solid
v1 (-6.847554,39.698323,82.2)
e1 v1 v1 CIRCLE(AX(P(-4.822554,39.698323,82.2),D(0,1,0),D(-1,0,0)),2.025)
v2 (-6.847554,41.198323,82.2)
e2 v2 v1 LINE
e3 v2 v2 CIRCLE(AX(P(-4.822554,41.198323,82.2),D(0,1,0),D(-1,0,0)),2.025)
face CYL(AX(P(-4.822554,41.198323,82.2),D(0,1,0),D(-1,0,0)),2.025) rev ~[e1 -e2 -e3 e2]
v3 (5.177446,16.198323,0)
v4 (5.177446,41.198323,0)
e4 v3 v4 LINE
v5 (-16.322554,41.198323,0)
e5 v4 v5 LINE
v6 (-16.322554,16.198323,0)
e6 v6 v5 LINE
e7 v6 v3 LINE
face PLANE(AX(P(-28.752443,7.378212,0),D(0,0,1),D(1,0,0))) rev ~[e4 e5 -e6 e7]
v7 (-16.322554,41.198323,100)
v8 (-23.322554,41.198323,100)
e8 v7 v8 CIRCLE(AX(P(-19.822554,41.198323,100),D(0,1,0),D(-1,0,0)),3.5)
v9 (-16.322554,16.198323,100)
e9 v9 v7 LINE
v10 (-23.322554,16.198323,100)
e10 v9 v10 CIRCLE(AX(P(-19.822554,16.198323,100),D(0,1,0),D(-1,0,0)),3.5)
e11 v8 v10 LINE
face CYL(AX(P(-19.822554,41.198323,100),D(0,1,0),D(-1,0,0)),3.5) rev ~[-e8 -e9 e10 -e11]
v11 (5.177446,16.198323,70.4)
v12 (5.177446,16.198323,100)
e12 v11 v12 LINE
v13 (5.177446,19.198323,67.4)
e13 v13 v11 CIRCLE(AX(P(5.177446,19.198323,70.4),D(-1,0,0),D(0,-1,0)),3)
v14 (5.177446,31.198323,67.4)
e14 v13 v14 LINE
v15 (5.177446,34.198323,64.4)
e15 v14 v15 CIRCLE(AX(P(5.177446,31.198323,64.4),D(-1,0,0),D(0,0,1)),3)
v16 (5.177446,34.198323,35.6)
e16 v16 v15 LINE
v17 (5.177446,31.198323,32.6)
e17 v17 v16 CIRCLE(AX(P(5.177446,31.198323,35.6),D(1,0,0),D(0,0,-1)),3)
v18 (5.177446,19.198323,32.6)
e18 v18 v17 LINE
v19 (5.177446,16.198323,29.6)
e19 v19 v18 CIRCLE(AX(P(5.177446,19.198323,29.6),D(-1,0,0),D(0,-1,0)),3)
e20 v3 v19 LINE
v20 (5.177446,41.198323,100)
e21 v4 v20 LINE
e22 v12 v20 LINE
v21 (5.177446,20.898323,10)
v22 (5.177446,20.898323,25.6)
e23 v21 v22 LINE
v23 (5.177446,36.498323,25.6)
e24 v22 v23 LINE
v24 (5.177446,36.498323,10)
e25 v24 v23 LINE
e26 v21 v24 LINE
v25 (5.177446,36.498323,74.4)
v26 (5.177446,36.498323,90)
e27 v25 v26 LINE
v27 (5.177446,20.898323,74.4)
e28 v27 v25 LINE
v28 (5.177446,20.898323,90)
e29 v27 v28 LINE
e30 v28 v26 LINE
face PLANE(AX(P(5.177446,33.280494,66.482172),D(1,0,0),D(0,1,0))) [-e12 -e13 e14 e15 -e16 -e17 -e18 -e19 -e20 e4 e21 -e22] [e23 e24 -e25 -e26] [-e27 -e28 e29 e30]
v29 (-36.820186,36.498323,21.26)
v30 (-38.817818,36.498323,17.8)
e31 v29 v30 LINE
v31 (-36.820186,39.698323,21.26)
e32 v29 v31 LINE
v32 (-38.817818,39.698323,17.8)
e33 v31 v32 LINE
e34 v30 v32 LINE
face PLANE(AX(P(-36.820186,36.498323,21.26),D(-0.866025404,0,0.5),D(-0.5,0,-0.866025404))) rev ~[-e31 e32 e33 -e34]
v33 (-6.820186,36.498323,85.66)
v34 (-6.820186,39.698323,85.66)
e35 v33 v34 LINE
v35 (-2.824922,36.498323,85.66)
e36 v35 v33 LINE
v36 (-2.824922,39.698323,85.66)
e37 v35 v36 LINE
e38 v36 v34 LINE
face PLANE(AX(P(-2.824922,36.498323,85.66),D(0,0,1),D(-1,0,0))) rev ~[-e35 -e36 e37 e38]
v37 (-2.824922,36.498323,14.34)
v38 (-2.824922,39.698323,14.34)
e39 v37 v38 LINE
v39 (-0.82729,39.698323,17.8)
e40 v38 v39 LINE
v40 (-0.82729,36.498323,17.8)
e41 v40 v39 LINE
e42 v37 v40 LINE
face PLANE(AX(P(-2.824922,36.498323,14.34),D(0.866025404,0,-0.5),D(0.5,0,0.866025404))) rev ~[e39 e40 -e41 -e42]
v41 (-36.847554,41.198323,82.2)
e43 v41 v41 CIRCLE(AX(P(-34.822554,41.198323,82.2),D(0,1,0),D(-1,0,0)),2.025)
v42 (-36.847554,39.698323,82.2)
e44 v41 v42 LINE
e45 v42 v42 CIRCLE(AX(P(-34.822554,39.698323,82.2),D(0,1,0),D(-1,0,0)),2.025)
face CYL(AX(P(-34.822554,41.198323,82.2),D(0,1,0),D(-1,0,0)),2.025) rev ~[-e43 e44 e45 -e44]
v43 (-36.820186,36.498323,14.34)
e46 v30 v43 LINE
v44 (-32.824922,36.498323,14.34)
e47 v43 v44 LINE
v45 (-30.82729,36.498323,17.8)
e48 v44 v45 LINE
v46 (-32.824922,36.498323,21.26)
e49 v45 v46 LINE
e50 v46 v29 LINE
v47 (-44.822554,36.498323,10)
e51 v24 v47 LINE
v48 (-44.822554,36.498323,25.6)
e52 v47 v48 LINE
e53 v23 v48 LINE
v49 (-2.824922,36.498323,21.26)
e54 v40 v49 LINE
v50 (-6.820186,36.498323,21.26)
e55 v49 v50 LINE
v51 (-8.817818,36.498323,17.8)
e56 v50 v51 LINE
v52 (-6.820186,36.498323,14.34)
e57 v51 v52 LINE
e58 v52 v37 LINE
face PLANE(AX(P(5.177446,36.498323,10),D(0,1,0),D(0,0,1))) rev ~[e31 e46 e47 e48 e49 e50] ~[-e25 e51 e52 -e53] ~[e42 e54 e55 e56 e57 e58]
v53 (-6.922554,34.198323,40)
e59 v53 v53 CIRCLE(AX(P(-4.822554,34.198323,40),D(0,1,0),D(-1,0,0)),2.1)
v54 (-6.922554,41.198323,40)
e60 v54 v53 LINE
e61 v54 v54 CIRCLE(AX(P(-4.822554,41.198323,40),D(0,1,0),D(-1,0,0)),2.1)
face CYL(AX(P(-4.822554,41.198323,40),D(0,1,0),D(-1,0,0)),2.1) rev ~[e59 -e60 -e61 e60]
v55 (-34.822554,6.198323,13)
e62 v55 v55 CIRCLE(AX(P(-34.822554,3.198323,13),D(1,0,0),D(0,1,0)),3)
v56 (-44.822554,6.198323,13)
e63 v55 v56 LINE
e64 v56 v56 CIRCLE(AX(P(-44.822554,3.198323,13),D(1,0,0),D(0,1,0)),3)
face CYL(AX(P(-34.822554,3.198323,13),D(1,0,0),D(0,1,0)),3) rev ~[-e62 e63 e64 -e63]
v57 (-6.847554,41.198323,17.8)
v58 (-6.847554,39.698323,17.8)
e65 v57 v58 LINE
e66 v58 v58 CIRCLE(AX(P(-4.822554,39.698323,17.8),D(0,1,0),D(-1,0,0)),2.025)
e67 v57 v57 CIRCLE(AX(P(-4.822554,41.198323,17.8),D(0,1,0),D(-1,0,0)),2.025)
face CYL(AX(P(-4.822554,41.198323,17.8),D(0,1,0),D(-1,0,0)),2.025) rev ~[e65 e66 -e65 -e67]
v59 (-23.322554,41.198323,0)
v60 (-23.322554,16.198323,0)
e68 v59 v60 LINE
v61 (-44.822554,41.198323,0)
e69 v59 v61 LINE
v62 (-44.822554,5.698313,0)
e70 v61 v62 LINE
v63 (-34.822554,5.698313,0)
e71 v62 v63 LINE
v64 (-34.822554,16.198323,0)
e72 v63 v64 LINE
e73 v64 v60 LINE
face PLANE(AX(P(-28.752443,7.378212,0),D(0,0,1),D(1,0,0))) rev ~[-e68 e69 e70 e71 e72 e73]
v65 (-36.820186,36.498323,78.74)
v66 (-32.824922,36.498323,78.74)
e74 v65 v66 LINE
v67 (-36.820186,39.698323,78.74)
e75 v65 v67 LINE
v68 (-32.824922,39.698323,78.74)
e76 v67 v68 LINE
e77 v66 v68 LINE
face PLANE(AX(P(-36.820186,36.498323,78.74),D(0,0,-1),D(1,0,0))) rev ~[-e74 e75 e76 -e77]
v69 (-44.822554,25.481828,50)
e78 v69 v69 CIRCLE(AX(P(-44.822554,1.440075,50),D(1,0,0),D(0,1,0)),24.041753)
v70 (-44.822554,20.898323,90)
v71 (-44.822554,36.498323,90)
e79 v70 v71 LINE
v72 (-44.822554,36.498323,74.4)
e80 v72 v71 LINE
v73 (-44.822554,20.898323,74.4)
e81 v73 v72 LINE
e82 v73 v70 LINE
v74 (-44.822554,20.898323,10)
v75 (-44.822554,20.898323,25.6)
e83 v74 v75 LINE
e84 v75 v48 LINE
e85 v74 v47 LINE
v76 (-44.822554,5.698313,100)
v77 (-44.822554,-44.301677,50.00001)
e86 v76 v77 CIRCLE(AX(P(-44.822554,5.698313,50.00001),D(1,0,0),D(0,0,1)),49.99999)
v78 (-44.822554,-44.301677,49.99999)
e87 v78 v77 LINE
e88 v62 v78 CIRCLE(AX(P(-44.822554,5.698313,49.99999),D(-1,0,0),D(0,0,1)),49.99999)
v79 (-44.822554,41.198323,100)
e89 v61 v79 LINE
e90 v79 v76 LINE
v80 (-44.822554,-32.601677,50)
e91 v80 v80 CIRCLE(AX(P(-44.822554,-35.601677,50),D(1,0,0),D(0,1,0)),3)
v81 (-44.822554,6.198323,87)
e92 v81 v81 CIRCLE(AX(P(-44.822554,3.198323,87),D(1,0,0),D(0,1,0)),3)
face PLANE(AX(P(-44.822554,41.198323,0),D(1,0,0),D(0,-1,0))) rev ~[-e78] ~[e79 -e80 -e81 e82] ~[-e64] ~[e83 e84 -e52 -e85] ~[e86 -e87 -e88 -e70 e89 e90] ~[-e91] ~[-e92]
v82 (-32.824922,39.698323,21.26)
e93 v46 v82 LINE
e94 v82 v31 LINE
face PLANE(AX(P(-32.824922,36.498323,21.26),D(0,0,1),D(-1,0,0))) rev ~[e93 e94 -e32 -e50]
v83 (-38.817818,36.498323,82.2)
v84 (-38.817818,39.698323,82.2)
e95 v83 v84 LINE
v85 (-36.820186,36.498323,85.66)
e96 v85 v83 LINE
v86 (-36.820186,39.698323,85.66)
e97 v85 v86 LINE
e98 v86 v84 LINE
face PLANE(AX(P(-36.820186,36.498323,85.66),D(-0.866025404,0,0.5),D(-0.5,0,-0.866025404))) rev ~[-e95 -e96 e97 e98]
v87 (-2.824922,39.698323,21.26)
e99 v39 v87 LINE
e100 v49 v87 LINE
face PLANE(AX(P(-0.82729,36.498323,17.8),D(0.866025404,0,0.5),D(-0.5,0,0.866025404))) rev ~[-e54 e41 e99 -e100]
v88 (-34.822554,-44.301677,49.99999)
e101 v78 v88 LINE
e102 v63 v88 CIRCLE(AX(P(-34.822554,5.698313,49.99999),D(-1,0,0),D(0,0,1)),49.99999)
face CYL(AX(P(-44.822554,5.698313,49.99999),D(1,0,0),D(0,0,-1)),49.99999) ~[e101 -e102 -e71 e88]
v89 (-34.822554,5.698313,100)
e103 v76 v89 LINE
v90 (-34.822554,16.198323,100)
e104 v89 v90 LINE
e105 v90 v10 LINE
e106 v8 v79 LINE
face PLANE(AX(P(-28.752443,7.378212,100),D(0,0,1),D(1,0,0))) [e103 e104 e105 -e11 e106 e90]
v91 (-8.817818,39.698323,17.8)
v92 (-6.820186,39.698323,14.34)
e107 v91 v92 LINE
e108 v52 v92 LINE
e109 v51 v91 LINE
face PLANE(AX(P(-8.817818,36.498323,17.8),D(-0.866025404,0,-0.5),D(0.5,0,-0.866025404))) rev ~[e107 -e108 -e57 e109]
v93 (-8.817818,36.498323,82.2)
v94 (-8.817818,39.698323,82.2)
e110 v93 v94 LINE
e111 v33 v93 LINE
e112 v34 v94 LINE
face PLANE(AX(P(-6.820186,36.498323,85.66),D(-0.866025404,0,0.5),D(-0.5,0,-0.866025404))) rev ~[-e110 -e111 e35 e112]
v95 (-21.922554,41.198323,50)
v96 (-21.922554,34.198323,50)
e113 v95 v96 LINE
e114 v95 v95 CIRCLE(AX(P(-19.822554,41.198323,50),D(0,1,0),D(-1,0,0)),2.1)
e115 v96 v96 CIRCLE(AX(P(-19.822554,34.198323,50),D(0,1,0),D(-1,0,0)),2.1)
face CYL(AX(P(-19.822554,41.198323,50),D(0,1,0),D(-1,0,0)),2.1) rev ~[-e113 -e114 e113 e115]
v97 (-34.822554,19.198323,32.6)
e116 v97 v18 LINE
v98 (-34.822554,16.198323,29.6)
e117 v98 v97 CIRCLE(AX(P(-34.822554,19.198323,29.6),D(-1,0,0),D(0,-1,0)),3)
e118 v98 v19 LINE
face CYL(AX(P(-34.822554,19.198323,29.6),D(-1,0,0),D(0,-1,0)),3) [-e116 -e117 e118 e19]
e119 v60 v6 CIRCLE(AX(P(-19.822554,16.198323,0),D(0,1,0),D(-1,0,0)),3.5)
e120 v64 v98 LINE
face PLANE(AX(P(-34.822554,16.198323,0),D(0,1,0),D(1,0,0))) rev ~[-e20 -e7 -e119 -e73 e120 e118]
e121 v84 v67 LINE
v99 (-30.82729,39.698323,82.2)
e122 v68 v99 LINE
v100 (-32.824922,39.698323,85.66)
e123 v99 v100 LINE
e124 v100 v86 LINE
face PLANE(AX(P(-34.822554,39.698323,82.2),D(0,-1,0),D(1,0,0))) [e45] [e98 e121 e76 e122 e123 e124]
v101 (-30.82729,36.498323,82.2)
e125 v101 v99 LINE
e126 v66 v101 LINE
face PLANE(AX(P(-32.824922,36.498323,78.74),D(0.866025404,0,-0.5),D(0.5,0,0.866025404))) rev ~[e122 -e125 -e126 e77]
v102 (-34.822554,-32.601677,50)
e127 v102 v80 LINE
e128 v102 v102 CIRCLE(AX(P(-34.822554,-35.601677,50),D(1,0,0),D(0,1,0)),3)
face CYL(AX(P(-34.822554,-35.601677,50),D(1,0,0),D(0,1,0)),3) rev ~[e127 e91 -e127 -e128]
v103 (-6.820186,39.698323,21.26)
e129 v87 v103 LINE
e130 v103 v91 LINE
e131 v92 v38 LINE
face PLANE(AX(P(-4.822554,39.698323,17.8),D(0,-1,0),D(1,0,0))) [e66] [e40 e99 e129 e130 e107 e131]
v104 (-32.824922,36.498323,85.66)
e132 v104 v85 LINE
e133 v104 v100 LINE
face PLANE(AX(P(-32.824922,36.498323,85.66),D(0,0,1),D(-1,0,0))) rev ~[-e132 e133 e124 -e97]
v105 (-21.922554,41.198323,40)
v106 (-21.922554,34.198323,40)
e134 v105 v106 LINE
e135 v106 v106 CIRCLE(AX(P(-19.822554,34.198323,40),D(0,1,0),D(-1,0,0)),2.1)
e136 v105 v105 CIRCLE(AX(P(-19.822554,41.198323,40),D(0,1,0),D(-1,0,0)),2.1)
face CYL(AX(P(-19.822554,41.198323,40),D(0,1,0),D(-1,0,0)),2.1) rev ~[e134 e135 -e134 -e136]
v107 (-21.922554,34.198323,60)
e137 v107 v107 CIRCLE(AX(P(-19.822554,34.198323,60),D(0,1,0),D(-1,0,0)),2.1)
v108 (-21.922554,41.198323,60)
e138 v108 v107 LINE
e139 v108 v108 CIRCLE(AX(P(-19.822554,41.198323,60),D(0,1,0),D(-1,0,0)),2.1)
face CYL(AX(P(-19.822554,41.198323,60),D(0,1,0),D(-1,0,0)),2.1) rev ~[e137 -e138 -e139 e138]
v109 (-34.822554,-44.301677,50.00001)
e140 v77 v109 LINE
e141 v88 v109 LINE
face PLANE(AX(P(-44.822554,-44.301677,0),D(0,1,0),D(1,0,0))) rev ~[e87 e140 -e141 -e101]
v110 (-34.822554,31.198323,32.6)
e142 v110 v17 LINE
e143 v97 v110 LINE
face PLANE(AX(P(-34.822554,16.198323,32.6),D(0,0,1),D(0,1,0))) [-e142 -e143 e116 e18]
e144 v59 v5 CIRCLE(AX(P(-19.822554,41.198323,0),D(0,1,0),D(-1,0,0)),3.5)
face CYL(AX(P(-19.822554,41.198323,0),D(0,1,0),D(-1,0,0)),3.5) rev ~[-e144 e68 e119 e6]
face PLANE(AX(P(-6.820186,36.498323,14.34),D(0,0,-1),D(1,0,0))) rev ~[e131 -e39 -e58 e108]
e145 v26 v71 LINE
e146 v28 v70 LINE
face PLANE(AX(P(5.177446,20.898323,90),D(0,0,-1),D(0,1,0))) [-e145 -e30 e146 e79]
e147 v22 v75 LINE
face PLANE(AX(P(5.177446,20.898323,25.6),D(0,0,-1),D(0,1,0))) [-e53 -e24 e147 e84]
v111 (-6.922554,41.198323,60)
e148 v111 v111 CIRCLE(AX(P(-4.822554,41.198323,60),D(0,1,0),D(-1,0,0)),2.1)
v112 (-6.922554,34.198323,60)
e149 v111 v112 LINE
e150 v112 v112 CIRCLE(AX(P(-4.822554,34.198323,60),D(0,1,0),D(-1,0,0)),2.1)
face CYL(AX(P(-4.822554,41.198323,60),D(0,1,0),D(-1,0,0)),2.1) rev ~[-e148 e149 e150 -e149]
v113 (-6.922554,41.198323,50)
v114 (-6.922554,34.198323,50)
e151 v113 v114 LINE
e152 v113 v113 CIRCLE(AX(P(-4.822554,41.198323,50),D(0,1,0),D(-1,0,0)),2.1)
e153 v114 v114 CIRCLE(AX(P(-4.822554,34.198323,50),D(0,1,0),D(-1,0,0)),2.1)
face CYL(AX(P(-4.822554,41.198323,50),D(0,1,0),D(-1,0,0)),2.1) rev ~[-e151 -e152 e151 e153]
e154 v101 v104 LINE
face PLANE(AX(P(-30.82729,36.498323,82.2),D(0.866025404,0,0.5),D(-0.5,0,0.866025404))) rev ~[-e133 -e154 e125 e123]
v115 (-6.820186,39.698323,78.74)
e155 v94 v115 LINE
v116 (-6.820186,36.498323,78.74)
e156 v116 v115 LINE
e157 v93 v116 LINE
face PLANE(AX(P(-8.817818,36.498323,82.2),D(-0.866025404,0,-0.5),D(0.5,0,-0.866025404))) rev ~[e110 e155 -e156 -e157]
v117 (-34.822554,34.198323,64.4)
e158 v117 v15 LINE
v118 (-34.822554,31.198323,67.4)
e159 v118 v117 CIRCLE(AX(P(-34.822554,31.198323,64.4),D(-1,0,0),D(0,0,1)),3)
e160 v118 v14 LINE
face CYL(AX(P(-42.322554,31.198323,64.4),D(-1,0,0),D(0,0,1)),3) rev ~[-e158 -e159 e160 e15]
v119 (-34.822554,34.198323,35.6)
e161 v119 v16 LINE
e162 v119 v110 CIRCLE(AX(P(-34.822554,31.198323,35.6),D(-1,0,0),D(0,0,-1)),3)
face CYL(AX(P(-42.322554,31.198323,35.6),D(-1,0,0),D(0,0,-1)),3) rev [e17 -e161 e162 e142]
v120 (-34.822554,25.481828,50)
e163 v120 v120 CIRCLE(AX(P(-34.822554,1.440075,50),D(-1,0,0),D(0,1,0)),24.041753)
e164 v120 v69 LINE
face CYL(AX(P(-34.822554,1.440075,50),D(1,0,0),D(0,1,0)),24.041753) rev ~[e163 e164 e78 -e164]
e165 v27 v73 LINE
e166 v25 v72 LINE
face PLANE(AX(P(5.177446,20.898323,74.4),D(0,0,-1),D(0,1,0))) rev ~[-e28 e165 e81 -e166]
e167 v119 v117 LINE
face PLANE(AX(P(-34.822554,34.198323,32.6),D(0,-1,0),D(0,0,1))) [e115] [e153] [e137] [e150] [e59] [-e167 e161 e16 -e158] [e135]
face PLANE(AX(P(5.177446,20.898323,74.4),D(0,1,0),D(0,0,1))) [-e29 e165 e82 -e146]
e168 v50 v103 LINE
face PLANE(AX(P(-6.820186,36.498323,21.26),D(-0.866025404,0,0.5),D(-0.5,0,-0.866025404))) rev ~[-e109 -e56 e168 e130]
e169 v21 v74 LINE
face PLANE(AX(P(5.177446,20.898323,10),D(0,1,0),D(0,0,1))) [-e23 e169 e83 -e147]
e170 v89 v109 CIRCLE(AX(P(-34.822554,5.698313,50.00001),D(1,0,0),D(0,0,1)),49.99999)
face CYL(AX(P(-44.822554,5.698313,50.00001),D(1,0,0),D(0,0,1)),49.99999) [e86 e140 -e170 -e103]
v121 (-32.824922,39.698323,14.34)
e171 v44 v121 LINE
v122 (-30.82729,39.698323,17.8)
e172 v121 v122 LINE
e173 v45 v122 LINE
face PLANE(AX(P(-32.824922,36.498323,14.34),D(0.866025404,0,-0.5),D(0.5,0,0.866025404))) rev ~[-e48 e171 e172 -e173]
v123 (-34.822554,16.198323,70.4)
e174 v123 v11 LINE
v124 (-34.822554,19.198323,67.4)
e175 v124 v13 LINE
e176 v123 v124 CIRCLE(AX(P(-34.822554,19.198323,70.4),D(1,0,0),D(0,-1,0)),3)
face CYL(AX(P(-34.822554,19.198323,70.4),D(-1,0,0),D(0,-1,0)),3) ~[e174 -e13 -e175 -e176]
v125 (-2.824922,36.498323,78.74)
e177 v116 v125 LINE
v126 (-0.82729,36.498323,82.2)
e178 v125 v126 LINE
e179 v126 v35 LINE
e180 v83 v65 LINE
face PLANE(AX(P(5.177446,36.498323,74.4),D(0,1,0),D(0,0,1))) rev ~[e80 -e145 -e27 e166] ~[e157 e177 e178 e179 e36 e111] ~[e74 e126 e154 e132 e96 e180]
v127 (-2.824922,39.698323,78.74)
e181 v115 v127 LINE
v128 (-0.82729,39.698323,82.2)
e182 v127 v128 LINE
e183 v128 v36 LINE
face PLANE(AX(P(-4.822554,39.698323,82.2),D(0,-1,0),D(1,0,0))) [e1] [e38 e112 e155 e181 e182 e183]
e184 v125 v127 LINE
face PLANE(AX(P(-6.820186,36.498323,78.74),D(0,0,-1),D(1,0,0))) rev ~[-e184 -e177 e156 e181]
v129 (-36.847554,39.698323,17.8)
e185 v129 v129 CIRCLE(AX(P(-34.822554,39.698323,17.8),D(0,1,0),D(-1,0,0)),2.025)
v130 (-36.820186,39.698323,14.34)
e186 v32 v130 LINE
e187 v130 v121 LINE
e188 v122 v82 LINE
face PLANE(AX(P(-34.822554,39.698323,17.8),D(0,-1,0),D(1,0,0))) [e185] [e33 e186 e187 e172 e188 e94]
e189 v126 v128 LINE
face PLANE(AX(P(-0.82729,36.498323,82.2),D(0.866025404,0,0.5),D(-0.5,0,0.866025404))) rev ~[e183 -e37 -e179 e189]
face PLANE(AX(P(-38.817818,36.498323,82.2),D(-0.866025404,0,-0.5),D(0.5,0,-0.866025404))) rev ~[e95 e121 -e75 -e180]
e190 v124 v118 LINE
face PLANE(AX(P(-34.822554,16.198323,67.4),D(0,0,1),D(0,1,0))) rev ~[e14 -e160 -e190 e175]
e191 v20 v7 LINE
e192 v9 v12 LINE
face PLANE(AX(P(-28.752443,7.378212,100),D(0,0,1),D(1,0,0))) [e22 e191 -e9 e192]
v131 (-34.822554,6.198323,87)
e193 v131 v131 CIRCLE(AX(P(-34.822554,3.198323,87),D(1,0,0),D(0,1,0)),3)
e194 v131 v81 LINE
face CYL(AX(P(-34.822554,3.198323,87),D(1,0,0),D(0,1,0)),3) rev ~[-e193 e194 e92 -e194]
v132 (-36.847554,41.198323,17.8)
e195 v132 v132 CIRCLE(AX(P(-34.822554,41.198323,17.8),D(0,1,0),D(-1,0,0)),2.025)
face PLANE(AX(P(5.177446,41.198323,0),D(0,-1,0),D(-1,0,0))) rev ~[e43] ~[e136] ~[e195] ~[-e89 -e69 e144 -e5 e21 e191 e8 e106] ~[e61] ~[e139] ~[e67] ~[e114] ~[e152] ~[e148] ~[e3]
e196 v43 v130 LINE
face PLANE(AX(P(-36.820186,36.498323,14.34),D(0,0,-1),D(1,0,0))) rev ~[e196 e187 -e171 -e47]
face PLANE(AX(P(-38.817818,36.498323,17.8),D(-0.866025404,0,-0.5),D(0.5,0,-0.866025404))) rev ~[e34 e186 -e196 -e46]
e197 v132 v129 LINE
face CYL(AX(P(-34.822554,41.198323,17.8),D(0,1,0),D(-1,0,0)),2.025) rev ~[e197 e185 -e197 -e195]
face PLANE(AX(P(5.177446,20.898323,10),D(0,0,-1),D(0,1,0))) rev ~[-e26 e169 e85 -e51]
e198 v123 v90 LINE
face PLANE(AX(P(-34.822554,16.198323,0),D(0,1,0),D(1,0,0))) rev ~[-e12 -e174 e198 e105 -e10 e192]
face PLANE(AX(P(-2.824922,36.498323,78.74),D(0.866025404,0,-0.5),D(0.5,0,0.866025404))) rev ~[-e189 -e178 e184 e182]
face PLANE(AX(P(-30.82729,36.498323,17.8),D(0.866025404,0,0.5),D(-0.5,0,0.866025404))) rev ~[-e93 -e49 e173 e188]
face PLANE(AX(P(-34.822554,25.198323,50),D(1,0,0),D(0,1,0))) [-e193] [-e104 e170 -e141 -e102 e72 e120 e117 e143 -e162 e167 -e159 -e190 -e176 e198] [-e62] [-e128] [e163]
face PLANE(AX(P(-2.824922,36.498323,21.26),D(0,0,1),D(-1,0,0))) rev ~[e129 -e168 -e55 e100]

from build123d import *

# Parameters (mm, degrees)
F1_DEPTH     = 100
F2_W         = 15.6
F2_H         = 15.6
F3_DEPTH     = 134.9
F5_DEPTH     = 3.2
F6_R         = 2.025
F7_DEPTH     = 10
F8_R         = 3
F8_R_2       = 24.0417525773
F9_DEPTH     = 15
F10_R        = 49.99999
F11_W        = 18
F11_H        = 34.8
F12_DEPTH    = 100
F13_R        = 3.5
F14_DEPTH    = 50
F15_R        = 2.1
F16_DEPTH    = 25
F17_T1_DEPTH = 47.5
F17_T3_DEPTH = 47.5


# Not quite as in the source:
# - a fillet or chamfer that OpenCascade refuses, or shapes differently, is made with other operations: its cross-section is extruded or revolved along the edge and cut away or added
# - a fillet or chamfer is up to 0.001 mm smaller than in the source, because OpenCascade refuses the exact size


with BuildPart() as f1:
    # F0 (on Top) → F1 (new body)
    with BuildSketch(Plane.XY):
        Polygon((5.1774463622, 16.1983228068), (5.1774463622, 41.1983228068), (-44.8225536378, 41.1983228068), (-44.8225536378, -44.3016771932), (-34.8225536378, -44.3016771932), (-34.8225536378, 16.1983228068), align=None)
    extrude(amount=F1_DEPTH)

    # F2 (on face) → F3 (cut)
    with BuildSketch(Plane.YZ.offset(5.1774463622)):
        with Locations((28.6983228068, 17.8)):
            Rectangle(F2_W, F2_H)
        with Locations((28.6983228068, 82.2)):
            Rectangle(F2_W, F2_H)
    extrude(amount=-F3_DEPTH, mode=Mode.SUBTRACT)

    # F4 (on face) → F5 (cut)
    with BuildSketch(Plane.XZ.offset(-36.4983228068)):
        Polygon((-2.8249217064, 85.66), (-6.8201855692, 85.66), (-8.8178175006, 82.2), (-6.8201855692, 78.74), (-2.8249217064, 78.74), (-0.827289775, 82.2), align=None)
        Polygon((-32.8249217064, 85.66), (-36.8201855692, 85.66), (-38.8178175006, 82.2), (-36.8201855692, 78.74), (-32.8249217064, 78.74), (-30.827289775, 82.2), align=None)
        Polygon((-32.8249217064, 21.26), (-36.8201855692, 21.26), (-38.8178175006, 17.8), (-36.8201855692, 14.34), (-32.8249217064, 14.34), (-30.827289775, 17.8), align=None)
        Polygon((-2.8249217064, 21.26), (-6.8201855692, 21.26), (-8.8178175006, 17.8), (-6.8201855692, 14.34), (-2.8249217064, 14.34), (-0.827289775, 17.8), align=None)
    extrude(amount=-F5_DEPTH, mode=Mode.SUBTRACT)

    # F6 (on face) → F7 (cut)
    with BuildSketch(Plane(origin=(0, 41.1983228068, 0), x_dir=(-1, 0, 0), z_dir=(0, 1, 0))):
        with Locations((34.8225536378, 82.2)):
            Circle(F6_R)
        with Locations((4.8225536378, 17.8)):
            Circle(F6_R)
        with Locations((34.8225536378, 17.8)):
            Circle(F6_R)
        with Locations((4.8225536378, 82.2)):
            Circle(F6_R)
    extrude(amount=-F7_DEPTH, mode=Mode.SUBTRACT)

    # F8 (on face) → F9 (cut)
    with BuildSketch(Plane.YZ.offset(-34.8225536378)):
        with Locations((3.1983228068, 87)):
            Circle(F8_R)
        with Locations((3.1983228068, 13)):
            Circle(F8_R)
        with Locations((-35.6016771932, 50)):
            Circle(F8_R)
        with Locations((1.4400753841, 50)):
            Circle(F8_R_2)
    extrude(amount=-F9_DEPTH, mode=Mode.SUBTRACT)

    # F10 (radius 50 in the source; OpenCascade refuses exactly that, so slightly less here)
    f10_edges = [f1.edges().sort_by_distance(p)[0] for p in [
        (-39.822554, -44.301677, 100),
        (-39.822554, -44.301677, 0),
    ]]
    fillet(f10_edges, radius=F10_R)

    # F11 (on face) → F12 (cut)
    with BuildSketch(Plane.YZ.offset(-34.8225536378)):
        with Locations((25.1983228068, 50)):
            Rectangle(F11_W, F11_H)
    extrude(amount=F12_DEPTH, mode=Mode.SUBTRACT)

    # F13 (on face) → F14 (cut)
    with BuildSketch(Plane(origin=(0, 41.1983228068, 0), x_dir=(-1, 0, 0), z_dir=(0, 1, 0))):
        with Locations((19.8225536378, 0)):
            Circle(F13_R)
        with Locations((19.8225536378, 100)):
            Circle(F13_R)
    extrude(amount=-F14_DEPTH, mode=Mode.SUBTRACT)

    # F15 (on face) → F16 (cut)
    with BuildSketch(Plane(origin=(0, 41.1983228068, 0), x_dir=(-1, 0, 0), z_dir=(0, 1, 0))):
        with Locations((19.8225536378, 50)):
            Circle(F15_R)
        with Locations((19.8225536378, 60)):
            Circle(F15_R)
        with Locations((19.8225536378, 40)):
            Circle(F15_R)
        with Locations((4.8225536378, 50)):
            Circle(F15_R)
        with Locations((4.8225536378, 60)):
            Circle(F15_R)
        with Locations((4.8225536378, 40)):
            Circle(F15_R)
    extrude(amount=-F16_DEPTH, mode=Mode.SUBTRACT)

    # F17: fillet of radius 3 on 4 edges, made by hand

    # F17_s2 → F17_t1 (join)
    with BuildSketch(Plane.YZ.offset(-42.3225536378)):
        with BuildLine():
            ThreePointArc((31.1983228068, 67.4), (33.3196431503, 66.5213203436), (34.1983228068, 64.4))
            Line((34.1983228068, 64.4), (34.1983228068, 67.4))
            Line((34.1983228068, 67.4), (31.1983228068, 67.4))
        make_face()
        with BuildLine():
            ThreePointArc((31.1983228068, 32.6), (33.3196431503, 33.4786796564), (34.1983228068, 35.6))
            Line((34.1983228068, 35.6), (34.1983228068, 32.6))
            Line((34.1983228068, 32.6), (31.1983228068, 32.6))
        make_face()
    extrude(amount=F17_T1_DEPTH)

    # F17_s4 → F17_t3 (cut)
    with BuildSketch(Plane.YZ.offset(-34.8225536378)):
        with BuildLine():
            ThreePointArc((16.1983228068, 70.4), (17.0770024632, 68.2786796564), (19.1983228068, 67.4))
            Line((19.1983228068, 67.4), (16.1983228068, 67.4))
            Line((16.1983228068, 67.4), (16.1983228068, 70.4))
        make_face()
        with BuildLine():
            ThreePointArc((16.1983228068, 29.6), (17.0770024632, 31.7213203436), (19.1983228068, 32.6))
            Line((19.1983228068, 32.6), (16.1983228068, 32.6))
            Line((16.1983228068, 32.6), (16.1983228068, 29.6))
        make_face()
    extrude(amount=F17_T3_DEPTH, mode=Mode.SUBTRACT)


solid = f1.part
